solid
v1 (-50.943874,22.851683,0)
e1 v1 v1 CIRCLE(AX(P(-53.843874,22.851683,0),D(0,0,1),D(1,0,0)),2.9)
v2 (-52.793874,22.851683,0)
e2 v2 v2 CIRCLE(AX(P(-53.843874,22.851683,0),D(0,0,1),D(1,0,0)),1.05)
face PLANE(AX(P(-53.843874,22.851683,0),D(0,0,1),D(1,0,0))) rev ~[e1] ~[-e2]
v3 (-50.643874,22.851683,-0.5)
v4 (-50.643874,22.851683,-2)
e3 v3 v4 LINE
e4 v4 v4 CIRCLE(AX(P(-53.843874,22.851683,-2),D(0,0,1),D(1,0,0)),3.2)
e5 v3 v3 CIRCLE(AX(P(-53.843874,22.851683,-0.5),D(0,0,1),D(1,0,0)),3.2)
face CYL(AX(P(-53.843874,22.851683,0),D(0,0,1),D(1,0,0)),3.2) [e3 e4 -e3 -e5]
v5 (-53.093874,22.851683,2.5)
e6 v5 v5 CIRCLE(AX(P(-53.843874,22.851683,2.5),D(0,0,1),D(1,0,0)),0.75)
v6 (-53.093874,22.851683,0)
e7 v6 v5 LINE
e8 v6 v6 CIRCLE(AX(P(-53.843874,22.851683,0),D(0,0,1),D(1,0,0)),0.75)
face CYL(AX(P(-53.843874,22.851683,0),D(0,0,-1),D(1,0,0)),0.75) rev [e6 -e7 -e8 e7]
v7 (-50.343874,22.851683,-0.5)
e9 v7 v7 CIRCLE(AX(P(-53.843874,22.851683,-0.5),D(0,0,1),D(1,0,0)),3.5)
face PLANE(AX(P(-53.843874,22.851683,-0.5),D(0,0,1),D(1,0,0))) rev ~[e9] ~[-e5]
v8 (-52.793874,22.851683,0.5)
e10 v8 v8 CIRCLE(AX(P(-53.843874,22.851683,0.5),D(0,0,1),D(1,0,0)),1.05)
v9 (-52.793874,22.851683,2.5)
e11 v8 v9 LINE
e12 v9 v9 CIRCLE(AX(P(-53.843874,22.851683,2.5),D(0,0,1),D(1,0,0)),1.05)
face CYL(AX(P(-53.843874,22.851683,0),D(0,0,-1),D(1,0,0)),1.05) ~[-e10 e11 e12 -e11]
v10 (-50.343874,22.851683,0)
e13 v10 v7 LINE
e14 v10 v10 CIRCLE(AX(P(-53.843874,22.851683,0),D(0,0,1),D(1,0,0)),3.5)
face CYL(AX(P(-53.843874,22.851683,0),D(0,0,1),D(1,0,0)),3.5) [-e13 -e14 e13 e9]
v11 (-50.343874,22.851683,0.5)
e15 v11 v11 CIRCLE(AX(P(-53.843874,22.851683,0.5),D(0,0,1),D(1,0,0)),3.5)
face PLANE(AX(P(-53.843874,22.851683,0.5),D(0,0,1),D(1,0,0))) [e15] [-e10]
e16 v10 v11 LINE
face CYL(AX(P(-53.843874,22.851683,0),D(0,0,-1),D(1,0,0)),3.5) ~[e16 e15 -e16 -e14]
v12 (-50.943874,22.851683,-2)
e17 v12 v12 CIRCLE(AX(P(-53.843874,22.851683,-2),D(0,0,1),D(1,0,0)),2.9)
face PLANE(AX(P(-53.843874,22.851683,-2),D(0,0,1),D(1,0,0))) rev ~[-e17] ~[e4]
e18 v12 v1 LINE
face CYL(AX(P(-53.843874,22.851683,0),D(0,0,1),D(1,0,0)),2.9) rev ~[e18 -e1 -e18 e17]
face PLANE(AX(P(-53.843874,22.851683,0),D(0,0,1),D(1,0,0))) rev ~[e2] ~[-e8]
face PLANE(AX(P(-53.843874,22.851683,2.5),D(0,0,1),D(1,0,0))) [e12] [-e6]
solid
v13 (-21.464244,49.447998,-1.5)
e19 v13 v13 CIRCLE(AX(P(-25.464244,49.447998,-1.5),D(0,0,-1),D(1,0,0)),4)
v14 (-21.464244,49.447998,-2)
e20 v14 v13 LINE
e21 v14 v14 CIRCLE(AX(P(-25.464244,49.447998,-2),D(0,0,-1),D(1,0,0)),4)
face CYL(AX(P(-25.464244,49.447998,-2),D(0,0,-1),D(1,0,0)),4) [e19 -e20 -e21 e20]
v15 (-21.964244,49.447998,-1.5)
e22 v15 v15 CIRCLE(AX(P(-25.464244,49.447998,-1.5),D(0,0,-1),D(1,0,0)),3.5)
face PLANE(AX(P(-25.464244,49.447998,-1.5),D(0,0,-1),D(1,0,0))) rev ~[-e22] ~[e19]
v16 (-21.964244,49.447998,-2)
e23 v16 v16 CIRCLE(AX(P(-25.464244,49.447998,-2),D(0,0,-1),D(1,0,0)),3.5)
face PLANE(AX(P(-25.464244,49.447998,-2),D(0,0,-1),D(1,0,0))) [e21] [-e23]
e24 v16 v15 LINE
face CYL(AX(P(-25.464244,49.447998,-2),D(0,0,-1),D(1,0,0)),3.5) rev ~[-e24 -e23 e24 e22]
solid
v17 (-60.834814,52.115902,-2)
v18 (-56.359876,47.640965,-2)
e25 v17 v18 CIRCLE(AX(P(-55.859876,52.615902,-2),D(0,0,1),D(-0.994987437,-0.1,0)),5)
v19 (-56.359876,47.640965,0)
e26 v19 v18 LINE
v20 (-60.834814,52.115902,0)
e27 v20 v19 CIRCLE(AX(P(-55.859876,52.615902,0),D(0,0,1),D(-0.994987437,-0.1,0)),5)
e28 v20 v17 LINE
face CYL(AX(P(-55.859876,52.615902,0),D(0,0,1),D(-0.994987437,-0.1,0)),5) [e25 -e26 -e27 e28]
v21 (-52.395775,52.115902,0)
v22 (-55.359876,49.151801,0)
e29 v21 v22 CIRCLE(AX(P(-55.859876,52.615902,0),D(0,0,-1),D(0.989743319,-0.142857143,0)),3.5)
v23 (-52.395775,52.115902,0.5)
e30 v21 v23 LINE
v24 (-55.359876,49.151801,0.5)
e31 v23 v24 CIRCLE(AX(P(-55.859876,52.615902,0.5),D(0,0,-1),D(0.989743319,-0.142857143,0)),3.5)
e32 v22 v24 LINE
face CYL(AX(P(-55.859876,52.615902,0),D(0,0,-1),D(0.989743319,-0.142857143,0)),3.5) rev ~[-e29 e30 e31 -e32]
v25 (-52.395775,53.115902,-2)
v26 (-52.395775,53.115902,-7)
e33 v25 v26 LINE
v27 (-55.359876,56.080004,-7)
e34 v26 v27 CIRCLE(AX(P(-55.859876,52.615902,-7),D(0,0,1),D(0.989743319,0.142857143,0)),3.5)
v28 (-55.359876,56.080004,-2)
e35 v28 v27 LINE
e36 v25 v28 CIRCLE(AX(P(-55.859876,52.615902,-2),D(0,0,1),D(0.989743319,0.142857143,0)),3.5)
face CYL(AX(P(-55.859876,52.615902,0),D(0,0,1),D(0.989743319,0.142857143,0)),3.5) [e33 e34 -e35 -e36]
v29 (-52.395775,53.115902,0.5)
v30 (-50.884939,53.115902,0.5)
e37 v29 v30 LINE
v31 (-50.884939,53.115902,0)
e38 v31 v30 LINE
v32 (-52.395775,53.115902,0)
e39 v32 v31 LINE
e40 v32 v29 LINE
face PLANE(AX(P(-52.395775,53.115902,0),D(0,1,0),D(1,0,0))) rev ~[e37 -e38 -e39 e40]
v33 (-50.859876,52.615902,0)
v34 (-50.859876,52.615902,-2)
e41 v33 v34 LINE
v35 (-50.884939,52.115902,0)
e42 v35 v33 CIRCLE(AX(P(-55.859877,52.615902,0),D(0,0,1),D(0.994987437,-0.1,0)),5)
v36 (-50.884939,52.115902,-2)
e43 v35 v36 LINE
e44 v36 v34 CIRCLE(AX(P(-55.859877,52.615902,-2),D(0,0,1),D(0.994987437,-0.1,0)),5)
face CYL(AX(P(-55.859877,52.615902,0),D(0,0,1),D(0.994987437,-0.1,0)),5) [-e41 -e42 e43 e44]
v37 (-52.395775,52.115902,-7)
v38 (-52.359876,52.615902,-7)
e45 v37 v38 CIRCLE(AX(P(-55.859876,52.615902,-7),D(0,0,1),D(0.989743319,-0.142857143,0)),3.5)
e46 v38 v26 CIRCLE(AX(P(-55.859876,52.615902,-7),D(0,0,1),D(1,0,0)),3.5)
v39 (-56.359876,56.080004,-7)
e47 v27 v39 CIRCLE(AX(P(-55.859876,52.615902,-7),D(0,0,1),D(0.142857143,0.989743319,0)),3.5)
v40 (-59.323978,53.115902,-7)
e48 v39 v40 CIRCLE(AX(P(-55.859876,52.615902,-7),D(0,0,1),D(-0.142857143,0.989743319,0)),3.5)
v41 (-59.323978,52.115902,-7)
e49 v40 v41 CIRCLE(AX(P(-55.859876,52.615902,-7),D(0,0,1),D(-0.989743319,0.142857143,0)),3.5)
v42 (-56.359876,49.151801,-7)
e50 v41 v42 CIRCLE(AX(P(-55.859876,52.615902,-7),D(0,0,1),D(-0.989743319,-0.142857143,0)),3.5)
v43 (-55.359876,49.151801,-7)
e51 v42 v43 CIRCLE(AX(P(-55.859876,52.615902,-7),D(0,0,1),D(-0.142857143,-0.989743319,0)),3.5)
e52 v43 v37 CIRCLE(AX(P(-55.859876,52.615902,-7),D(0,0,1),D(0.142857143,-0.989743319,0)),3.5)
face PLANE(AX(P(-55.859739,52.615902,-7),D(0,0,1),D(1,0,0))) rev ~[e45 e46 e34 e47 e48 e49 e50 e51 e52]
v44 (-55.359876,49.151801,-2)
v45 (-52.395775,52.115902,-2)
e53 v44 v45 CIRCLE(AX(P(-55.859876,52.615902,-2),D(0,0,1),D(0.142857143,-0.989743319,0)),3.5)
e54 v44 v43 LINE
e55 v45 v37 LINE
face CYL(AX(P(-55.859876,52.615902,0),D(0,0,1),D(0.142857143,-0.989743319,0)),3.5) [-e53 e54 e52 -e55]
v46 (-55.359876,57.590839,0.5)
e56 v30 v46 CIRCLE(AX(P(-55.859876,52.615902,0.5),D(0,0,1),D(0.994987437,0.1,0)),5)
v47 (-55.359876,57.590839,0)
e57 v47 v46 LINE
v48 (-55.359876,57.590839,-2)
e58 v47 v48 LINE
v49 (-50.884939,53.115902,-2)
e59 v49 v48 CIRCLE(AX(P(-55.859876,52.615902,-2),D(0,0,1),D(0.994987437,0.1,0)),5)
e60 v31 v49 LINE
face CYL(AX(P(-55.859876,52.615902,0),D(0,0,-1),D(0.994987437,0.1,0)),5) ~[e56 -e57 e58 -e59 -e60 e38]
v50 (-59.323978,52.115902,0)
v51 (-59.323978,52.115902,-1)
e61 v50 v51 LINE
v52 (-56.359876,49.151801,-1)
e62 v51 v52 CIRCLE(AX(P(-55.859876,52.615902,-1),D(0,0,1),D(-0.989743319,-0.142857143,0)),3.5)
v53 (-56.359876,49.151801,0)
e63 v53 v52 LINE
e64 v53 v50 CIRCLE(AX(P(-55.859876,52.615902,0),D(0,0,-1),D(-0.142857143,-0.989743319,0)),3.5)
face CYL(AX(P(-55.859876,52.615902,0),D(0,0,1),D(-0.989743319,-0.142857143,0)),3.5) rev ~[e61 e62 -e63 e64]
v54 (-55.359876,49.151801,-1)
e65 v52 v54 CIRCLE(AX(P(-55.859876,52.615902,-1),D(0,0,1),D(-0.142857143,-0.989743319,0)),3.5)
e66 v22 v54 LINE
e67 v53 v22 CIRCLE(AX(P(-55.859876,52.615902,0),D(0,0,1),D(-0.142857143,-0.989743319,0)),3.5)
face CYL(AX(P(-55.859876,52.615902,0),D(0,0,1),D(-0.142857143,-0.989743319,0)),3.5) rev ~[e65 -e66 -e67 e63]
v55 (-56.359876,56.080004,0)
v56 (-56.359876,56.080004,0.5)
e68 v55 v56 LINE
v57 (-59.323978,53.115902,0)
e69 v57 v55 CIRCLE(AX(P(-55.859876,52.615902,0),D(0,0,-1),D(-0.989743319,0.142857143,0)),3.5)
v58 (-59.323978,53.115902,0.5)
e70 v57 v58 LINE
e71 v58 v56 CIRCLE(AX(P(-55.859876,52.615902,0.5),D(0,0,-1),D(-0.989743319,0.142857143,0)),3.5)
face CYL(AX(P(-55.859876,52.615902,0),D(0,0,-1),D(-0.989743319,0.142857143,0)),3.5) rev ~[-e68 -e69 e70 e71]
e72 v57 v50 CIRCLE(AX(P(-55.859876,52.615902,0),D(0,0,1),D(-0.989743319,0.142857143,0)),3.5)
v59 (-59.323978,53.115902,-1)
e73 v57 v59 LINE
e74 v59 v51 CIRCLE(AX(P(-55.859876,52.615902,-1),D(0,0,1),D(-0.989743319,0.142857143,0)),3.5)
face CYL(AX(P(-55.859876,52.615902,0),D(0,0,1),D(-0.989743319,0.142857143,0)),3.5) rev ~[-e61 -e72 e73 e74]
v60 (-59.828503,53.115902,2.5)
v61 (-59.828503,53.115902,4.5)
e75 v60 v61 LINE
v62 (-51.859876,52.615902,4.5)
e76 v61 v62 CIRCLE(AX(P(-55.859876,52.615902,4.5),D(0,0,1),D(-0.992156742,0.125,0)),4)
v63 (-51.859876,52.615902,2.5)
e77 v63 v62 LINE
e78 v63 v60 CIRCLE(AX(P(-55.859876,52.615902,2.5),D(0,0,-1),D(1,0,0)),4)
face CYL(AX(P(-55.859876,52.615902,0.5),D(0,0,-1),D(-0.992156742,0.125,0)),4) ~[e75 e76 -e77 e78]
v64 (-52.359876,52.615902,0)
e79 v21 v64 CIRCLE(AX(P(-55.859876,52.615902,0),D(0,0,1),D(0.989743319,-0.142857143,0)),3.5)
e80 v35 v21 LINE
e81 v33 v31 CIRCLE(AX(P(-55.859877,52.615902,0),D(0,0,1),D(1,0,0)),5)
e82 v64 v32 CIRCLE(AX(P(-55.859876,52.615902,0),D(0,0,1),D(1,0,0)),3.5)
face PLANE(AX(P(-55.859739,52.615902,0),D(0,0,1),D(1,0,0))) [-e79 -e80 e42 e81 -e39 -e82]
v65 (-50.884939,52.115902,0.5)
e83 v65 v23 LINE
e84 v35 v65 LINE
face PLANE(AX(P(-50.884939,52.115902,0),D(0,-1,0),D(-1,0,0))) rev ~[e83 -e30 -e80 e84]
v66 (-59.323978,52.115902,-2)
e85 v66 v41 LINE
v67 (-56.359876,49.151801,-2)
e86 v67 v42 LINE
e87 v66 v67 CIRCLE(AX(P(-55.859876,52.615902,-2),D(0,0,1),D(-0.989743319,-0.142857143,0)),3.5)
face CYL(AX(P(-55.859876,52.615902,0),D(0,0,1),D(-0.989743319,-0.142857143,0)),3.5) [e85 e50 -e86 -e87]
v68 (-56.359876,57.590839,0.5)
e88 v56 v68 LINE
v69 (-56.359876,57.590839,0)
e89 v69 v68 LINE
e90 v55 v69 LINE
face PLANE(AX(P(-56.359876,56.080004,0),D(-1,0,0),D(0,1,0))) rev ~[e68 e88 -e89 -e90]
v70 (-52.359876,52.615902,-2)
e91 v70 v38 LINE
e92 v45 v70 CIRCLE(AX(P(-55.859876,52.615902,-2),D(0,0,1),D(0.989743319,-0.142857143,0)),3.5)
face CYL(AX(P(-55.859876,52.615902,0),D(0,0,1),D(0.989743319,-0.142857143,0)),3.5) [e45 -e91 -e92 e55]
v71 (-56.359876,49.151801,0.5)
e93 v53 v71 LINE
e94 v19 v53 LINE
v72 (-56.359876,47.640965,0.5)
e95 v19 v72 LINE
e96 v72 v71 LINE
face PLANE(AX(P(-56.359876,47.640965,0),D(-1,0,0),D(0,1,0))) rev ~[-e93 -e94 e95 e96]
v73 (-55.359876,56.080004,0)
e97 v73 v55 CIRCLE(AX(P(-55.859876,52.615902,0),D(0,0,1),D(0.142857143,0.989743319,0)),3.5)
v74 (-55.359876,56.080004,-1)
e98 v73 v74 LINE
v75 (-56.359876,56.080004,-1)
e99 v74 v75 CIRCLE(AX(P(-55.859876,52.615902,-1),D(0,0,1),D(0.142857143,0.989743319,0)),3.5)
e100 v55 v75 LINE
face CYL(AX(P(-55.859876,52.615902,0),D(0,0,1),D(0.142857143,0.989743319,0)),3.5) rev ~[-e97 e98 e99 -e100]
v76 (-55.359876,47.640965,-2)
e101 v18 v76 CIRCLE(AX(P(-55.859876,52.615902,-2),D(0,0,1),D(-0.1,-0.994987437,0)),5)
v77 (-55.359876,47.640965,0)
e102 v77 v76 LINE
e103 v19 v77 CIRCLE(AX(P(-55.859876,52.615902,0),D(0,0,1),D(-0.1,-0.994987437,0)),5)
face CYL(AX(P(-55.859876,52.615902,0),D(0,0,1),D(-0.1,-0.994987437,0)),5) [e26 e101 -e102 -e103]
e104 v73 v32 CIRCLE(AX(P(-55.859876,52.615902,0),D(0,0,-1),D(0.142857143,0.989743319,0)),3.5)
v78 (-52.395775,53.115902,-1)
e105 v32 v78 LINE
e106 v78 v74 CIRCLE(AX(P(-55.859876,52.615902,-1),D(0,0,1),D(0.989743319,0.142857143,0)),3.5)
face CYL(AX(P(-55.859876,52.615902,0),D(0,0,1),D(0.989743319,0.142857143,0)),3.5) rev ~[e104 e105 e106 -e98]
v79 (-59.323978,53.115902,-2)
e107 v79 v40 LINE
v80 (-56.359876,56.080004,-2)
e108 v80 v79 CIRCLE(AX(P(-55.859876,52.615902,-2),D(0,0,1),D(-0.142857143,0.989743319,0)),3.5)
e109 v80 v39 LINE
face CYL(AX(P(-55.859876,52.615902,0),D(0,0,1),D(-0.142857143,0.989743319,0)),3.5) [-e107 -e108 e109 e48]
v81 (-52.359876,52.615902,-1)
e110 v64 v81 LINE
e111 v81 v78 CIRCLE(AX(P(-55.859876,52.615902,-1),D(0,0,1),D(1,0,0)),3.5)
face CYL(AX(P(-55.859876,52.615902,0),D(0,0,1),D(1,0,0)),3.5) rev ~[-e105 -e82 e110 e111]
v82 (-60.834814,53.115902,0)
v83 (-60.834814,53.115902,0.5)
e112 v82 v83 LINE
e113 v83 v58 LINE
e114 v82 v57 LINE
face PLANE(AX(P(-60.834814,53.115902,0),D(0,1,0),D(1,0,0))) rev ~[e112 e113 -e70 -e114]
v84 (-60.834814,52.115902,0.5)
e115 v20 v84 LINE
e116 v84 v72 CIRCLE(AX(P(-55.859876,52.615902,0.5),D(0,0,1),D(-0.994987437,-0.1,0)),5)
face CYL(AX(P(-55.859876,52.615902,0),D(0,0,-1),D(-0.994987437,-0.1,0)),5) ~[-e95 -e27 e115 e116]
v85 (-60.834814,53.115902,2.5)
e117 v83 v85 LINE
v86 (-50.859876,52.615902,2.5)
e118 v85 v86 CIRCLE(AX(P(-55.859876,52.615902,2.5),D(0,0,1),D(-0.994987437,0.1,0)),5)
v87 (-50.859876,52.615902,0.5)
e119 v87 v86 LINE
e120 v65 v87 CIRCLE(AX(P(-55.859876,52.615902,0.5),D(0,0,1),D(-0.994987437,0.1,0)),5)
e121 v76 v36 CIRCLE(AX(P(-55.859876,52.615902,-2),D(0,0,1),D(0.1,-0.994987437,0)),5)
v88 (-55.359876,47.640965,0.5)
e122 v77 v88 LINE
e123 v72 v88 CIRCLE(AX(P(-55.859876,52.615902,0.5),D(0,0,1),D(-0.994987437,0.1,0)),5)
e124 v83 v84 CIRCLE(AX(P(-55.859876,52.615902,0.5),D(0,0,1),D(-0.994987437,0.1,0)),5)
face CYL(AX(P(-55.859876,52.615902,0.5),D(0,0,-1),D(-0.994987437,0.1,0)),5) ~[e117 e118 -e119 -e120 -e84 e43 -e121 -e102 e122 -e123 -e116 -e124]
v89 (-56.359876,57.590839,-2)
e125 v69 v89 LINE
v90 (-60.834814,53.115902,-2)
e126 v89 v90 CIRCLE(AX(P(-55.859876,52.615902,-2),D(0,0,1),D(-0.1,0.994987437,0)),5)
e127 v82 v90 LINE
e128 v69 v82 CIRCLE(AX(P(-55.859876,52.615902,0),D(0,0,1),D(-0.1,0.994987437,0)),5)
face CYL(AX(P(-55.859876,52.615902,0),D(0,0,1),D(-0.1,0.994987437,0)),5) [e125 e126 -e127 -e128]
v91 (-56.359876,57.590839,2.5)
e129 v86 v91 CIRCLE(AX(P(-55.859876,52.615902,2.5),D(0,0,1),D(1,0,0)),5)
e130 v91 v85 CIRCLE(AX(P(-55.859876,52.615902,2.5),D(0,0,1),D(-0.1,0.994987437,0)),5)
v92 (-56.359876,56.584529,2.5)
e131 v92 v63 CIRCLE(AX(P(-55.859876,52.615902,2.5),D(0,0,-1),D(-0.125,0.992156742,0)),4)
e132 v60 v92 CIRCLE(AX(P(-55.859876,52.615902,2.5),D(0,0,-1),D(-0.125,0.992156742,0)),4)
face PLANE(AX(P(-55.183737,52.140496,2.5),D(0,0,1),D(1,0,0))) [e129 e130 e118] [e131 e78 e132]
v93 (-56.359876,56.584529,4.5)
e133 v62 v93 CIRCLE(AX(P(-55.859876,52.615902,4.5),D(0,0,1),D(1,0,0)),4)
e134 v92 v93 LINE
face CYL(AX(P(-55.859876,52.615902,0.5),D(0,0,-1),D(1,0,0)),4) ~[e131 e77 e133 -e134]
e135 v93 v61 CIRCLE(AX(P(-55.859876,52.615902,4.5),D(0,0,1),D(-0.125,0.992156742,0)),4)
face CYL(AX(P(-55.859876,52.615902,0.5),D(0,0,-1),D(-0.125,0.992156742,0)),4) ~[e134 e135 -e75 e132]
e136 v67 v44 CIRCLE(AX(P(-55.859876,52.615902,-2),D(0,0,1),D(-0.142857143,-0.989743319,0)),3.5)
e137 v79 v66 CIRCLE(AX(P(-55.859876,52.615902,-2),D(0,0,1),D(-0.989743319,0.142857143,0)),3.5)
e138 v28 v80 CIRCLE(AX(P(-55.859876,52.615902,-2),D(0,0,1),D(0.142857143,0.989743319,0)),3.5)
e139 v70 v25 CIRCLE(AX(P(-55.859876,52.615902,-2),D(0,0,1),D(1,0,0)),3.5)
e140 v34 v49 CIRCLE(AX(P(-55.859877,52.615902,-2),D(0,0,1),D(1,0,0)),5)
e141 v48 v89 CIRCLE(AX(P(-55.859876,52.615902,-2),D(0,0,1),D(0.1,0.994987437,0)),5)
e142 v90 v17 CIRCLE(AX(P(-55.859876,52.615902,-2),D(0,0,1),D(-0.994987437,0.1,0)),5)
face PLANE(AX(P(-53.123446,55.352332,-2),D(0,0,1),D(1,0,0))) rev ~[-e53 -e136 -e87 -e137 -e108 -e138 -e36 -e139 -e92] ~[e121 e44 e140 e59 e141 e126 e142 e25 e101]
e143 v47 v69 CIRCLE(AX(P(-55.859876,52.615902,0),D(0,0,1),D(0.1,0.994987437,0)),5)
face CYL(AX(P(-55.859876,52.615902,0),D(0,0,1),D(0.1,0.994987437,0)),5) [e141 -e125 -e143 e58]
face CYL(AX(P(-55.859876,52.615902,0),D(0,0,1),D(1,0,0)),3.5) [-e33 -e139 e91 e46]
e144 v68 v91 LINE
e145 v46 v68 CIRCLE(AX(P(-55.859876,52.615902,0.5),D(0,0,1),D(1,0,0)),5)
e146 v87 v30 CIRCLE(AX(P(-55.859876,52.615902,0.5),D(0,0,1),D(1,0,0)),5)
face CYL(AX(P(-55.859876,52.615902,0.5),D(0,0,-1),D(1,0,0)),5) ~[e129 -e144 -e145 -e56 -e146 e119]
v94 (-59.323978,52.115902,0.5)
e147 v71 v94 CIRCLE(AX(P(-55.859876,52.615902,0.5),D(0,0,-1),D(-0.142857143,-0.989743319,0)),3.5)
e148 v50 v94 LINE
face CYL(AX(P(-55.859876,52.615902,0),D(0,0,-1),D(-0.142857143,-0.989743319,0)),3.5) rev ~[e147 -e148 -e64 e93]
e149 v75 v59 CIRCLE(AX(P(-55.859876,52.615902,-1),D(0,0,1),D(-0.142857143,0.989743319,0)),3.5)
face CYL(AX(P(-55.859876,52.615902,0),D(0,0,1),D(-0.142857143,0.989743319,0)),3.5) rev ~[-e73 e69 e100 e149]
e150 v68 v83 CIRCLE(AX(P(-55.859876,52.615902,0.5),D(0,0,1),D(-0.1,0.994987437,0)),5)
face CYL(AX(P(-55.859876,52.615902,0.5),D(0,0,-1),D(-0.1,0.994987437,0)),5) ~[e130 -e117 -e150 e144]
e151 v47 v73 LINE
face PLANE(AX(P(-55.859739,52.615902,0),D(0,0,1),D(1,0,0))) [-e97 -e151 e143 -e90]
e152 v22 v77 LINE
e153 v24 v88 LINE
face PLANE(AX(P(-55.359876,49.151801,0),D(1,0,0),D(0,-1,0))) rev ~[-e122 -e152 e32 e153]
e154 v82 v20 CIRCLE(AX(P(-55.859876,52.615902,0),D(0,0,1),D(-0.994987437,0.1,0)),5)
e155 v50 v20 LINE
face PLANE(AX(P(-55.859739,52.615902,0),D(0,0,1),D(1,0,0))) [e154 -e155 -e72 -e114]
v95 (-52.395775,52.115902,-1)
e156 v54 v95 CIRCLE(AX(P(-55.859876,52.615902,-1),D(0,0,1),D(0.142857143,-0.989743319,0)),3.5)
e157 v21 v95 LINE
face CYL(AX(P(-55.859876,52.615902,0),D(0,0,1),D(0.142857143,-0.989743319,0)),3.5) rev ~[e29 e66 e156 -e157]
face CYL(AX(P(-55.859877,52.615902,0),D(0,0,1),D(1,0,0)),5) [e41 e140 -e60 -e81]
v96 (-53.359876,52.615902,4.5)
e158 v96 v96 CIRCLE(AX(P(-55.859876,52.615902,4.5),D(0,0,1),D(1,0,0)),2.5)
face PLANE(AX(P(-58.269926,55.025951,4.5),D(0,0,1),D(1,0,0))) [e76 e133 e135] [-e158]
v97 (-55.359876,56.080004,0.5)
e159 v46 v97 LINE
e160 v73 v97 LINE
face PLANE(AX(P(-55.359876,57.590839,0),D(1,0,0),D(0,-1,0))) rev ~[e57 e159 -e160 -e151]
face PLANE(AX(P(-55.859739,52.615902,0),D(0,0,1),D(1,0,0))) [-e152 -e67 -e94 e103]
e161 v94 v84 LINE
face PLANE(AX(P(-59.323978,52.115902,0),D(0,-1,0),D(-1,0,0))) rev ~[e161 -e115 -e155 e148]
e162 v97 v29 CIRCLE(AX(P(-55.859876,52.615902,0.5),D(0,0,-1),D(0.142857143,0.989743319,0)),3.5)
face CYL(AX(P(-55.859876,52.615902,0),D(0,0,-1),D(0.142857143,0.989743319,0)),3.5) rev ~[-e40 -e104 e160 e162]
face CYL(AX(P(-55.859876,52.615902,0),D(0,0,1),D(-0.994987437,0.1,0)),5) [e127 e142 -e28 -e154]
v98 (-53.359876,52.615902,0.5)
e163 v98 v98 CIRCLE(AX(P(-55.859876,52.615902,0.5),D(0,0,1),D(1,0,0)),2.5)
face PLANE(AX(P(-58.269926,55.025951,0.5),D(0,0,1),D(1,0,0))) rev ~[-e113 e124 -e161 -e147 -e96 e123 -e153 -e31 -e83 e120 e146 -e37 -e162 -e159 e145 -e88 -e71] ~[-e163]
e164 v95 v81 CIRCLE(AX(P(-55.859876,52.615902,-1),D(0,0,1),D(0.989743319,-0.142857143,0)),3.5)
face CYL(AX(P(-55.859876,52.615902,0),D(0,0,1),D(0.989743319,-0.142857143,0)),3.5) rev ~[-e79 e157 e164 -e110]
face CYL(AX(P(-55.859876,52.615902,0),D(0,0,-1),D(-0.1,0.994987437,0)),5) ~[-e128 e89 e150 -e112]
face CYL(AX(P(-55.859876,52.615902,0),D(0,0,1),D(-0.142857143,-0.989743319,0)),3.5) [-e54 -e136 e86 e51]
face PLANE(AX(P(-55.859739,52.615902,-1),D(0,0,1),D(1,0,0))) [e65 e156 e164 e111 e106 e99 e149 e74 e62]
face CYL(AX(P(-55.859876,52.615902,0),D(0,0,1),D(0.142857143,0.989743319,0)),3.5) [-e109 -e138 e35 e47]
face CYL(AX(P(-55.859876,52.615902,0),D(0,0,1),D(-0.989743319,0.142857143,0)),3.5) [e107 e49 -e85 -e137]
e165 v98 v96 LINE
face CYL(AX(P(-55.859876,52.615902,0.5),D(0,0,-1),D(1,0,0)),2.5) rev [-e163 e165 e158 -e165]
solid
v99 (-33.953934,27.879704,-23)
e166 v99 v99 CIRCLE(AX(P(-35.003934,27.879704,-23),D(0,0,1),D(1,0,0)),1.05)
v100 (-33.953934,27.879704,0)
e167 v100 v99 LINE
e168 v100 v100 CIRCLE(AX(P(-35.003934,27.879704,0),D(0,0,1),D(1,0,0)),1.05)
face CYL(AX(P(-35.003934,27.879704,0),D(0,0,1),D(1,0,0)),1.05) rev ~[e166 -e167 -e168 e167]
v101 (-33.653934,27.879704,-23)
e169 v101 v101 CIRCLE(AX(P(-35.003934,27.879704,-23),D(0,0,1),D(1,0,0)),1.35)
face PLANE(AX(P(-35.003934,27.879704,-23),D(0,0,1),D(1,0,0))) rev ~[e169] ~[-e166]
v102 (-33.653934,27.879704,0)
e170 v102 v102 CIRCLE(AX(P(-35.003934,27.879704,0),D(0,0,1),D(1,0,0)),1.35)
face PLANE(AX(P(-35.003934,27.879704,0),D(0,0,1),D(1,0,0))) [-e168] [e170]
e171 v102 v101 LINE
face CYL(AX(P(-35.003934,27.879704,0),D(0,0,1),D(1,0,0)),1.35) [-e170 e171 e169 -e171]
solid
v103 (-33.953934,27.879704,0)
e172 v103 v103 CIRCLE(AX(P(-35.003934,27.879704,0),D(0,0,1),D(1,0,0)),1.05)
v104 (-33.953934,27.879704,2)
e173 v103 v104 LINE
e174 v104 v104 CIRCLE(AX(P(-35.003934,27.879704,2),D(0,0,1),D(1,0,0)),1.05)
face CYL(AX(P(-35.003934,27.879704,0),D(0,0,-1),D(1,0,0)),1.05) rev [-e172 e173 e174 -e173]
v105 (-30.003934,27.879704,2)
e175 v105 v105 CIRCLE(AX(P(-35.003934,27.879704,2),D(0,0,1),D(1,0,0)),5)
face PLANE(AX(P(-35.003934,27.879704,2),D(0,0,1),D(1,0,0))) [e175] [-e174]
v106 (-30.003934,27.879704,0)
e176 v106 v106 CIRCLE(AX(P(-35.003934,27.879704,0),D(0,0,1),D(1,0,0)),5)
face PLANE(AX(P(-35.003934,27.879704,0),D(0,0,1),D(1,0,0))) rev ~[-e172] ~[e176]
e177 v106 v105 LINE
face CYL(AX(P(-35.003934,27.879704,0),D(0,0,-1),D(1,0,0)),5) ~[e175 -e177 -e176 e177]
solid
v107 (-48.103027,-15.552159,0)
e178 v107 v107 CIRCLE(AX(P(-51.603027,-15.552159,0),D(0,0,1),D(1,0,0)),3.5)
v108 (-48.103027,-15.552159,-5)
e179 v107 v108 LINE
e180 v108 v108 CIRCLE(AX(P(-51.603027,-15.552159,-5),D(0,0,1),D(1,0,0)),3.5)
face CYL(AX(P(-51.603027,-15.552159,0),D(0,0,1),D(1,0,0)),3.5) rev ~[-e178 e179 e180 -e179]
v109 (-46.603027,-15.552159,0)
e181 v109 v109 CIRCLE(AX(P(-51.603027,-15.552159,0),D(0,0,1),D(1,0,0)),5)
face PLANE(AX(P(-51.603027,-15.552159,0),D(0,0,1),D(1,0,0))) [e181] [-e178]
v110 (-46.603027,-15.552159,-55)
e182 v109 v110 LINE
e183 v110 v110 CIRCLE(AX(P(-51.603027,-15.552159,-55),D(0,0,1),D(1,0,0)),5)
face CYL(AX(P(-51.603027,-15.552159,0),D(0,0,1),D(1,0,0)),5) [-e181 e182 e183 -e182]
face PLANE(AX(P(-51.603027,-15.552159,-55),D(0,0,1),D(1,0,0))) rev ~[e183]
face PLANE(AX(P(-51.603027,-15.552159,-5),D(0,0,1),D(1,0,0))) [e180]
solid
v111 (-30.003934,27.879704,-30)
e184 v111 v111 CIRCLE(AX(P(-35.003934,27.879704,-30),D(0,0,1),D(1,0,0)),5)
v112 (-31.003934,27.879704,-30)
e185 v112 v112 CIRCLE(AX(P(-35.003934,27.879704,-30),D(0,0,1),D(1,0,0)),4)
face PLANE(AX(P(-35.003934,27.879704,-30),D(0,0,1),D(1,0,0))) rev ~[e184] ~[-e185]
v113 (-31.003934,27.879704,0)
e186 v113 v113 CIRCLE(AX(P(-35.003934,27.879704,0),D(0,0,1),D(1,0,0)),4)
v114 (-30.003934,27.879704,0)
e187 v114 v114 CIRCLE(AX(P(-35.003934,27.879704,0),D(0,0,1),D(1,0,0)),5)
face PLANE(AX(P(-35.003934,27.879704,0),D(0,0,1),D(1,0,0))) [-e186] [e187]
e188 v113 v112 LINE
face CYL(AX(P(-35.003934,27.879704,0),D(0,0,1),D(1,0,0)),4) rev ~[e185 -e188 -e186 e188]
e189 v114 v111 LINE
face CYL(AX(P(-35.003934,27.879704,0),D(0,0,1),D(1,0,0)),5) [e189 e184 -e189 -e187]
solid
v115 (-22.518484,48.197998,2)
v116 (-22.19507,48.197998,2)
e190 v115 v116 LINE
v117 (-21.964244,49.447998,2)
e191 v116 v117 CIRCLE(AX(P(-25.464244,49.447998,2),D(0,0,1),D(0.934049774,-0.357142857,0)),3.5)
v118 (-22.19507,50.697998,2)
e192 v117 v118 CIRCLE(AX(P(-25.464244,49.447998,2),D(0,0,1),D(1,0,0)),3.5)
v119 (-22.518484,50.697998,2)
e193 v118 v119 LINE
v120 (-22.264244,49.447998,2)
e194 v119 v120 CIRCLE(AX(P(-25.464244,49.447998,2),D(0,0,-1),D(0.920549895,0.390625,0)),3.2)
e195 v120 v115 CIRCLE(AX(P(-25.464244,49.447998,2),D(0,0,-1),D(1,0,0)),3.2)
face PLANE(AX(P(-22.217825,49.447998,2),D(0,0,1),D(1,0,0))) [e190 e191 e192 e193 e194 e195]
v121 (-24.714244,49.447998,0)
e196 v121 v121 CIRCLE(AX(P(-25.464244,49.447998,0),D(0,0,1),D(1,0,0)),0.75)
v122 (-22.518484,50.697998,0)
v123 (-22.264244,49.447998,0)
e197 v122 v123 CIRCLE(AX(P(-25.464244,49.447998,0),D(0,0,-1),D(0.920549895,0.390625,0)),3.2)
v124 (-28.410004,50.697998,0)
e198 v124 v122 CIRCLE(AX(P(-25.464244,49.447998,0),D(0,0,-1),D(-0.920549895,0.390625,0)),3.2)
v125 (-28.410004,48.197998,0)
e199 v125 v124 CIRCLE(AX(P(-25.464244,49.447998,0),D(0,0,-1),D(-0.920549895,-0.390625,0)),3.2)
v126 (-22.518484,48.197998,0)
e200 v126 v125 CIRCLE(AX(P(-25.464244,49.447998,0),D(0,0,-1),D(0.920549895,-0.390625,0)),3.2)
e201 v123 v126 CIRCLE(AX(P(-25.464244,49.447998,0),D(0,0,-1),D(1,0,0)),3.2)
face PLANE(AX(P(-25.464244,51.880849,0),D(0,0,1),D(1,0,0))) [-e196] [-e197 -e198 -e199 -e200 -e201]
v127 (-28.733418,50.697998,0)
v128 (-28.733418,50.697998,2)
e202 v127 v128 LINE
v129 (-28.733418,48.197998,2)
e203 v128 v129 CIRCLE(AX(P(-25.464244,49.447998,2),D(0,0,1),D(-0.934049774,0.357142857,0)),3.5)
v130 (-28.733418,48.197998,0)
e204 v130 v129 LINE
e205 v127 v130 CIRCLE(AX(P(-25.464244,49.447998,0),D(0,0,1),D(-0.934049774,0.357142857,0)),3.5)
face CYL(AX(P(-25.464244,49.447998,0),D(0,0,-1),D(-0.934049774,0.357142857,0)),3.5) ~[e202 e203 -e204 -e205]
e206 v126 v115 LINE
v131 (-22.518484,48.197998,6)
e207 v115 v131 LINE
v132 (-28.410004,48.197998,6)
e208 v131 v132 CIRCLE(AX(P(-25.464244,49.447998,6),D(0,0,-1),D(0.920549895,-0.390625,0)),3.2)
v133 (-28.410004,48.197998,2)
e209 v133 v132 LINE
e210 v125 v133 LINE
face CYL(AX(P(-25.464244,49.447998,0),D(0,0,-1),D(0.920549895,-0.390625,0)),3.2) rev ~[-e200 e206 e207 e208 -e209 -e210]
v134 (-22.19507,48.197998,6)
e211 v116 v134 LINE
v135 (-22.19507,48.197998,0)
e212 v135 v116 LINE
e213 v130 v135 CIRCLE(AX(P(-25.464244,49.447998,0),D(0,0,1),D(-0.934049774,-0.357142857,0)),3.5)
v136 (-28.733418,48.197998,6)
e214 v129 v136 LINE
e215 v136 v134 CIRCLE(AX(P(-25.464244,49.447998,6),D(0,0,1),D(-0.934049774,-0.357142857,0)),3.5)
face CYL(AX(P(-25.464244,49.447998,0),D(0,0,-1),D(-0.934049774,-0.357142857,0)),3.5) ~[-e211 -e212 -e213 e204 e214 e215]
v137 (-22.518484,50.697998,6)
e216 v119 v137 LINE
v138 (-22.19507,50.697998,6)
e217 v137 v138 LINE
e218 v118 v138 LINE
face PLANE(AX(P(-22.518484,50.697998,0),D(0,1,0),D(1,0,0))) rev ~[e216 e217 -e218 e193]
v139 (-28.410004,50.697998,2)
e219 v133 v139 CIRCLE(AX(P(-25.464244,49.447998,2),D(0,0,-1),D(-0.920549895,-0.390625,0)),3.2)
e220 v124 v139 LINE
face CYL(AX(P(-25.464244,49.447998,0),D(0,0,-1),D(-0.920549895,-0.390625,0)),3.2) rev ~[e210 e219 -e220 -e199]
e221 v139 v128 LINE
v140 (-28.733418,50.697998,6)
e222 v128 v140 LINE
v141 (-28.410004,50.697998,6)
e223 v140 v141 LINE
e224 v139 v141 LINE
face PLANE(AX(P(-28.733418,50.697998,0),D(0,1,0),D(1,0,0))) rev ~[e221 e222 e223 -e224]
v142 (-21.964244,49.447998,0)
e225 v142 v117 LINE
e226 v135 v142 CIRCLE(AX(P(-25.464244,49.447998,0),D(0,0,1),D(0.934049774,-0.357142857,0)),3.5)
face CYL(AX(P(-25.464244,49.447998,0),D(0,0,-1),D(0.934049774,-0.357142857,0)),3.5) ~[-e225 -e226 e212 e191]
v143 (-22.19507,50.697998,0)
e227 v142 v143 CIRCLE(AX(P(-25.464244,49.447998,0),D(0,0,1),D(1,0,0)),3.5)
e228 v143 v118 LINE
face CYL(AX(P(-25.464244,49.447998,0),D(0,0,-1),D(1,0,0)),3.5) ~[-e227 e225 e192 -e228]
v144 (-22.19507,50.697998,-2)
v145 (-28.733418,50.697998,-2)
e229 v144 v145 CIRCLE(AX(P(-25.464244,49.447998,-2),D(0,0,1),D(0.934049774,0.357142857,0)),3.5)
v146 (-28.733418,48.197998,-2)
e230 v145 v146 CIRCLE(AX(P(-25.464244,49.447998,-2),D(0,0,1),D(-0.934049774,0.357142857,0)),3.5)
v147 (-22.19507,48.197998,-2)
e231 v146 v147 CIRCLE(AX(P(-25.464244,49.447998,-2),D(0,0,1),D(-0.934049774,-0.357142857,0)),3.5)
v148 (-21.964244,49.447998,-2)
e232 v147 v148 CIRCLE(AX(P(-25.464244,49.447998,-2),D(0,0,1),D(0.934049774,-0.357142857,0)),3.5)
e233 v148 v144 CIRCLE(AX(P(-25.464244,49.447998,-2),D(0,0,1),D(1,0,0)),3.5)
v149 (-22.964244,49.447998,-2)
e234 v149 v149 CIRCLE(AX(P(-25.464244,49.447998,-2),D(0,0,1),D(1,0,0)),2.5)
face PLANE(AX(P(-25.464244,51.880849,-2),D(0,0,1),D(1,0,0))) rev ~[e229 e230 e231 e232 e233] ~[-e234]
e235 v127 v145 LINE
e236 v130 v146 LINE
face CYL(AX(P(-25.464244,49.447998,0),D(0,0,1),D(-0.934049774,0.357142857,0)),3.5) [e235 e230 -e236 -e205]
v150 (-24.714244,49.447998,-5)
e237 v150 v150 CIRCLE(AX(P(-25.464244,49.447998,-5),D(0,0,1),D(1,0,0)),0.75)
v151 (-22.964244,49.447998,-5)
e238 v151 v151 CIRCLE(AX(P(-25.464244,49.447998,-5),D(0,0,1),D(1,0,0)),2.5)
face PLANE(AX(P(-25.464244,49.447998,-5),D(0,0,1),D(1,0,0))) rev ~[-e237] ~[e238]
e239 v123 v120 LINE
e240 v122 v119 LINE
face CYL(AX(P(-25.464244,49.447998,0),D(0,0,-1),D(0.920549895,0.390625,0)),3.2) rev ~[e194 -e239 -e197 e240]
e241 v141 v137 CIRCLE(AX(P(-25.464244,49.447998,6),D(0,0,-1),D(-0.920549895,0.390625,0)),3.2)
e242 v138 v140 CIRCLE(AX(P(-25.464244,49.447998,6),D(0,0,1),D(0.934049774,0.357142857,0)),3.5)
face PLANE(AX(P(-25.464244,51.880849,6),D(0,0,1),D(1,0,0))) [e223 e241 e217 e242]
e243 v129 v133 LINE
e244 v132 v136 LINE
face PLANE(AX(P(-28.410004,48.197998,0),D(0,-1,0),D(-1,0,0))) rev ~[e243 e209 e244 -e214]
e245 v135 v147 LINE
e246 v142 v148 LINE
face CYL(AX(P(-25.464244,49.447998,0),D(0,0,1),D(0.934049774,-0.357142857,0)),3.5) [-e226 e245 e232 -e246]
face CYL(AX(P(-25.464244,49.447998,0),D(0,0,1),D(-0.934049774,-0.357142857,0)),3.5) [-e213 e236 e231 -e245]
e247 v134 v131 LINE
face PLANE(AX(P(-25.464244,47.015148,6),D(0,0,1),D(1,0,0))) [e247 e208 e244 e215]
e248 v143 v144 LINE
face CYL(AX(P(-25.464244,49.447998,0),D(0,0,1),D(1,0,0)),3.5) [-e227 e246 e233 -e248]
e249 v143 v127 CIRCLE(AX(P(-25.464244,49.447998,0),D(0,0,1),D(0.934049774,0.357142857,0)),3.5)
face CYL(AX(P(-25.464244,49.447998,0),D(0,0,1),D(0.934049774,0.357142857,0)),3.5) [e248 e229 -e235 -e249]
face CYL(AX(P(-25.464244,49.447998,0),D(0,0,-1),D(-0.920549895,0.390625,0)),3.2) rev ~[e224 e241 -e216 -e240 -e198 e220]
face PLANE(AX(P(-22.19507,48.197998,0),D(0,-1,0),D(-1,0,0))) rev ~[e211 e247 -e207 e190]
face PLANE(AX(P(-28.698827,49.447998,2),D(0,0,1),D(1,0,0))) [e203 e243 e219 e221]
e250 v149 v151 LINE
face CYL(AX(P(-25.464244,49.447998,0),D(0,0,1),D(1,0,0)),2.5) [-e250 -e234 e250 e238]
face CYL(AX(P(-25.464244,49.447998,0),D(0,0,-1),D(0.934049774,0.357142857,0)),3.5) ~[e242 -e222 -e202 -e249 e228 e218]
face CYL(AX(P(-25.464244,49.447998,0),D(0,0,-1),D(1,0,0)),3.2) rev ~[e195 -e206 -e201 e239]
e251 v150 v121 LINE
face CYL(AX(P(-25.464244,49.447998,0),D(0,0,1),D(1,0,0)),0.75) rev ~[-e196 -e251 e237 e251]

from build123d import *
from build123d import SkipClean  # not in build123d's __all__

# Parameters (mm, degrees)
F1_DEPTH  = 2
F2_DEPTH  = 7
F3_DEPTH  = 0.5
F5_DEPTH  = 2
F4_R      = 2.5
F6_DEPTH  = 4
F7_DEPTH  = 1
F8_R      = 2.5
F8_R_2    = 0.75
F9_DEPTH  = 2
F10_DEPTH = 5
F11_DEPTH = 2
F12_DEPTH = 6
F13_R     = 3.5
F13_R_2   = 3.2
F13_R_3   = 2.9
F14_DEPTH = 0.5
F15_DEPTH = 2
F13_R_4   = 1.05
F16_DEPTH = 0.5
F13_R_5   = 0.75
F17_DEPTH = 2.5
F18_R     = 5
F18_R_2   = 4
F19_DEPTH = 30
F18_R_3   = 1.35
F18_R_4   = 1.05
F20_DEPTH = 23
F21_DEPTH = 2
F22_R     = 4
F22_R_2   = 3.5
F23_DEPTH = 0.5
F24_R     = 5
F24_R_2   = 3.5
F25_DEPTH = 55
F26_DEPTH = 5


with BuildPart() as f1:
    # F0 (on Top) → F1 (new body)
    with BuildSketch(Plane.XY):
        with BuildLine():
            Line((-52.3957748821, 53.1159022585), (-50.8849393117, 53.1159022585))
            ThreePointArc((-50.8849393117, 53.1159022585), (-52.3243425913, 56.1514361644), (-55.3598764972, 57.590839444))
            Line((-55.3598764972, 57.590839444), (-55.3598764972, 56.0800038736))
            ThreePointArc((-55.3598764972, 56.0800038736), (-53.3850027631, 55.0907759926), (-52.3957748821, 53.1159022585))
        make_face()
        with BuildLine():
            Line((-59.3239781124, 53.1159022585), (-60.8348136828, 53.1159022585))
            ThreePointArc((-60.8348136828, 53.1159022585), (-60.8598764972, 52.6159022585), (-60.8348136828, 52.1159022585))
            Line((-60.8348136828, 52.1159022585), (-59.3239781124, 52.1159022585))
            ThreePointArc((-59.3239781124, 52.1159022585), (-59.3598764972, 52.6159022585), (-59.3239781124, 53.1159022585))
        make_face()
        with BuildLine():
            ThreePointArc((-56.3598764972, 47.6409650729), (-55.8598764972, 47.6159022585), (-55.3598764972, 47.6409650729))
            Line((-55.3598764972, 47.6409650729), (-55.3598764972, 49.1518006433))
            ThreePointArc((-55.3598764972, 49.1518006433), (-55.8598764972, 49.1159022585), (-56.3598764972, 49.1518006433))
            Line((-56.3598764972, 49.1518006433), (-56.3598764972, 47.6409650729))
        make_face()
        with BuildLine():
            ThreePointArc((-55.3598764972, 47.6409650729), (-52.3243425913, 49.0803683525), (-50.8849393117, 52.1159022585))
            Line((-50.8849393117, 52.1159022585), (-52.3957748821, 52.1159022585))
            ThreePointArc((-52.3957748821, 52.1159022585), (-53.3850027631, 50.1410285243), (-55.3598764972, 49.1518006433))
            Line((-55.3598764972, 49.1518006433), (-55.3598764972, 47.6409650729))
        make_face()
        with BuildLine():
            ThreePointArc((-52.3598764972, 52.6159022585), (-52.3688626292, 52.8665457773), (-52.3957748821, 53.1159022585))
            ThreePointArc((-52.3957748821, 53.1159022585), (-53.3850027631, 55.0907759926), (-55.3598764972, 56.0800038736))
            ThreePointArc((-55.3598764972, 56.0800038736), (-55.8598764972, 56.1159022585), (-56.3598764972, 56.0800038736))
            ThreePointArc((-56.3598764972, 56.0800038736), (-58.3347502314, 55.0907759926), (-59.3239781124, 53.1159022585))
            ThreePointArc((-59.3239781124, 53.1159022585), (-59.3598764972, 52.6159022585), (-59.3239781124, 52.1159022585))
            ThreePointArc((-59.3239781124, 52.1159022585), (-58.3347502314, 50.1410285243), (-56.3598764972, 49.1518006433))
            ThreePointArc((-56.3598764972, 49.1518006433), (-55.8598764972, 49.1159022585), (-55.3598764972, 49.1518006433))
            ThreePointArc((-55.3598764972, 49.1518006433), (-53.3850027631, 50.1410285243), (-52.3957748821, 52.1159022585))
            ThreePointArc((-52.3957748821, 52.1159022585), (-52.3688626292, 52.3652587397), (-52.3598764972, 52.6159022585))
        make_face()
        with BuildLine():
            ThreePointArc((-50.8849393117, 52.1159022585), (-50.8661461317, 52.3655883832), (-50.8598764972, 52.6159022585))
            ThreePointArc((-50.8598764972, 52.6159022585), (-50.8661461317, 52.8662161338), (-50.8849393117, 53.1159022585))
            Line((-50.8849393117, 53.1159022585), (-52.3957748821, 53.1159022585))
            ThreePointArc((-52.3957748821, 53.1159022585), (-52.3688626292, 52.8665457773), (-52.3598764972, 52.6159022585))
            ThreePointArc((-52.3598764972, 52.6159022585), (-52.3688626292, 52.3652587397), (-52.3957748821, 52.1159022585))
            Line((-52.3957748821, 52.1159022585), (-50.8849393117, 52.1159022585))
        make_face()
        with BuildLine():
            ThreePointArc((-60.8348136828, 52.1159022585), (-59.3954104032, 49.0803683525), (-56.3598764972, 47.6409650729))
            Line((-56.3598764972, 47.6409650729), (-56.3598764972, 49.1518006433))
            ThreePointArc((-56.3598764972, 49.1518006433), (-58.3347502314, 50.1410285243), (-59.3239781124, 52.1159022585))
            Line((-59.3239781124, 52.1159022585), (-60.8348136828, 52.1159022585))
        make_face()
        with BuildLine():
            Line((-55.3598764972, 56.0800038736), (-55.3598764972, 57.590839444))
            ThreePointArc((-55.3598764972, 57.590839444), (-55.8598764972, 57.6159022585), (-56.3598764972, 57.590839444))
            Line((-56.3598764972, 57.590839444), (-56.3598764972, 56.0800038736))
            ThreePointArc((-56.3598764972, 56.0800038736), (-55.8598764972, 56.1159022585), (-55.3598764972, 56.0800038736))
        make_face()
        with BuildLine():
            Line((-56.3598764972, 56.0800038736), (-56.3598764972, 57.590839444))
            ThreePointArc((-56.3598764972, 57.590839444), (-59.3954104032, 56.1514361644), (-60.8348136828, 53.1159022585))
            Line((-60.8348136828, 53.1159022585), (-59.3239781124, 53.1159022585))
            ThreePointArc((-59.3239781124, 53.1159022585), (-58.3347502314, 55.0907759926), (-56.3598764972, 56.0800038736))
        make_face()
    extrude(amount=-F1_DEPTH)

    # F0 (on Top) → F2 (join)
    with BuildSketch(Plane.XY):
        with BuildLine():
            ThreePointArc((-52.3598764972, 52.6159022585), (-52.3688626292, 52.8665457773), (-52.3957748821, 53.1159022585))
            ThreePointArc((-52.3957748821, 53.1159022585), (-53.3850027631, 55.0907759926), (-55.3598764972, 56.0800038736))
            ThreePointArc((-55.3598764972, 56.0800038736), (-55.8598764972, 56.1159022585), (-56.3598764972, 56.0800038736))
            ThreePointArc((-56.3598764972, 56.0800038736), (-58.3347502314, 55.0907759926), (-59.3239781124, 53.1159022585))
            ThreePointArc((-59.3239781124, 53.1159022585), (-59.3598764972, 52.6159022585), (-59.3239781124, 52.1159022585))
            ThreePointArc((-59.3239781124, 52.1159022585), (-58.3347502314, 50.1410285243), (-56.3598764972, 49.1518006433))
            ThreePointArc((-56.3598764972, 49.1518006433), (-55.8598764972, 49.1159022585), (-55.3598764972, 49.1518006433))
            ThreePointArc((-55.3598764972, 49.1518006433), (-53.3850027631, 50.1410285243), (-52.3957748821, 52.1159022585))
            ThreePointArc((-52.3957748821, 52.1159022585), (-52.3688626292, 52.3652587397), (-52.3598764972, 52.6159022585))
        make_face()
    extrude(amount=-F2_DEPTH)

    # F0 (on Top) → F3 (join)
    with BuildSketch(Plane.XY):
        with BuildLine():
            Line((-52.3957748821, 53.1159022585), (-50.8849393117, 53.1159022585))
            ThreePointArc((-50.8849393117, 53.1159022585), (-52.3243425913, 56.1514361644), (-55.3598764972, 57.590839444))
            Line((-55.3598764972, 57.590839444), (-55.3598764972, 56.0800038736))
            ThreePointArc((-55.3598764972, 56.0800038736), (-53.3850027631, 55.0907759926), (-52.3957748821, 53.1159022585))
        make_face()
        with BuildLine():
            ThreePointArc((-55.3598764972, 47.6409650729), (-52.3243425913, 49.0803683525), (-50.8849393117, 52.1159022585))
            Line((-50.8849393117, 52.1159022585), (-52.3957748821, 52.1159022585))
            ThreePointArc((-52.3957748821, 52.1159022585), (-53.3850027631, 50.1410285243), (-55.3598764972, 49.1518006433))
            Line((-55.3598764972, 49.1518006433), (-55.3598764972, 47.6409650729))
        make_face()
        with BuildLine():
            ThreePointArc((-60.8348136828, 52.1159022585), (-59.3954104032, 49.0803683525), (-56.3598764972, 47.6409650729))
            Line((-56.3598764972, 47.6409650729), (-56.3598764972, 49.1518006433))
            ThreePointArc((-56.3598764972, 49.1518006433), (-58.3347502314, 50.1410285243), (-59.3239781124, 52.1159022585))
            Line((-59.3239781124, 52.1159022585), (-60.8348136828, 52.1159022585))
        make_face()
        with BuildLine():
            Line((-56.3598764972, 56.0800038736), (-56.3598764972, 57.590839444))
            ThreePointArc((-56.3598764972, 57.590839444), (-59.3954104032, 56.1514361644), (-60.8348136828, 53.1159022585))
            Line((-60.8348136828, 53.1159022585), (-59.3239781124, 53.1159022585))
            ThreePointArc((-59.3239781124, 53.1159022585), (-58.3347502314, 55.0907759926), (-56.3598764972, 56.0800038736))
        make_face()
    extrude(amount=F3_DEPTH)

    # F4 (on face) → F5 (join)
    with BuildSketch(Plane.XY.offset(0.5)):
        with BuildLine():
            ThreePointArc((-60.8348136828, 53.1159022585), (-56.1101903725, 47.6221718929), (-50.8598764972, 52.6159022585))
            ThreePointArc((-50.8598764972, 52.6159022585), (-52.505774531, 56.324001502), (-56.3598764972, 57.590839444))
            Line((-56.3598764972, 57.590839444), (-56.3598764972, 56.5845292251))
            ThreePointArc((-56.3598764972, 56.5845292251), (-53.2141251862, 55.6159022585), (-51.8598764972, 52.6159022585))
            ThreePointArc((-51.8598764972, 52.6159022585), (-56.1103681474, 48.6237532215), (-59.8285034638, 53.1159022585))
            Line((-59.8285034638, 53.1159022585), (-60.8348136828, 53.1159022585))
        make_face()
        with BuildLine():
            Line((-56.3598764972, 56.5845292251), (-56.3598764972, 57.590839444))
            ThreePointArc((-56.3598764972, 57.590839444), (-59.3954104032, 56.1514361644), (-60.8348136828, 53.1159022585))
            Line((-60.8348136828, 53.1159022585), (-59.8285034638, 53.1159022585))
            ThreePointArc((-59.8285034638, 53.1159022585), (-58.688303622, 55.4443293832), (-56.3598764972, 56.5845292251))
        make_face()
        with BuildLine():
            Line((-56.3598764972, 56.0800038736), (-56.3598764972, 56.5845292251))
            ThreePointArc((-56.3598764972, 56.5845292251), (-58.688303622, 55.4443293832), (-59.8285034638, 53.1159022585))
            Line((-59.8285034638, 53.1159022585), (-59.3239781124, 53.1159022585))
            ThreePointArc((-59.3239781124, 53.1159022585), (-58.3347502314, 55.0907759926), (-56.3598764972, 56.0800038736))
        make_face()
    extrude(amount=F5_DEPTH)

    # F4 (on face) → F6 (join)
    with BuildSketch(Plane.XY.offset(0.5)):
        with BuildLine():
            Line((-56.3598764972, 56.0800038736), (-56.3598764972, 56.5845292251))
            ThreePointArc((-56.3598764972, 56.5845292251), (-58.688303622, 55.4443293832), (-59.8285034638, 53.1159022585))
            Line((-59.8285034638, 53.1159022585), (-59.3239781124, 53.1159022585))
            ThreePointArc((-59.3239781124, 53.1159022585), (-58.3347502314, 55.0907759926), (-56.3598764972, 56.0800038736))
        make_face()
        with BuildLine():
            ThreePointArc((-51.8598764972, 52.6159022585), (-53.2141251862, 55.6159022585), (-56.3598764972, 56.5845292251))
            Line((-56.3598764972, 56.5845292251), (-56.3598764972, 56.0800038736))
            ThreePointArc((-56.3598764972, 56.0800038736), (-58.3347502314, 55.0907759926), (-59.3239781124, 53.1159022585))
            Line((-59.3239781124, 53.1159022585), (-59.8285034638, 53.1159022585))
            ThreePointArc((-59.8285034638, 53.1159022585), (-56.1103681474, 48.6237532215), (-51.8598764972, 52.6159022585))
        make_face()
        with Locations((-55.8598764972, 52.6159022585)):
            Circle(F4_R, mode=Mode.SUBTRACT)
    extrude(amount=F6_DEPTH)

    # F0 (on Top) → F7 (cut)
    with BuildSketch(Plane.XY):
        with BuildLine():
            ThreePointArc((-52.3598764972, 52.6159022585), (-52.3688626292, 52.8665457773), (-52.3957748821, 53.1159022585))
            ThreePointArc((-52.3957748821, 53.1159022585), (-53.3850027631, 55.0907759926), (-55.3598764972, 56.0800038736))
            ThreePointArc((-55.3598764972, 56.0800038736), (-55.8598764972, 56.1159022585), (-56.3598764972, 56.0800038736))
            ThreePointArc((-56.3598764972, 56.0800038736), (-58.3347502314, 55.0907759926), (-59.3239781124, 53.1159022585))
            ThreePointArc((-59.3239781124, 53.1159022585), (-59.3598764972, 52.6159022585), (-59.3239781124, 52.1159022585))
            ThreePointArc((-59.3239781124, 52.1159022585), (-58.3347502314, 50.1410285243), (-56.3598764972, 49.1518006433))
            ThreePointArc((-56.3598764972, 49.1518006433), (-55.8598764972, 49.1159022585), (-55.3598764972, 49.1518006433))
            ThreePointArc((-55.3598764972, 49.1518006433), (-53.3850027631, 50.1410285243), (-52.3957748821, 52.1159022585))
            ThreePointArc((-52.3957748821, 52.1159022585), (-52.3688626292, 52.3652587397), (-52.3598764972, 52.6159022585))
        make_face()
    extrude(amount=-F7_DEPTH, mode=Mode.SUBTRACT)


with BuildPart() as f9:
    # F8 (on Top) → F9 (new body)
    with BuildSketch(Plane.XY):
        with BuildLine():
            Line((-22.5184842519, 50.6979984153), (-22.1950697086, 50.6979984153))
            ThreePointArc((-22.1950697086, 50.6979984153), (-25.4642439163, 52.9479984153), (-28.7334181239, 50.6979984153))
            Line((-28.7334181239, 50.6979984153), (-28.4100035806, 50.6979984153))
            ThreePointArc((-28.4100035806, 50.6979984153), (-25.4642439163, 52.6479984153), (-22.5184842519, 50.6979984153))
        make_face()
        with BuildLine():
            Line((-28.4100035806, 50.6979984153), (-28.7334181239, 50.6979984153))
            ThreePointArc((-28.7334181239, 50.6979984153), (-28.9642439163, 49.4479984153), (-28.7334181239, 48.1979984153))
            Line((-28.7334181239, 48.1979984153), (-28.4100035806, 48.1979984153))
            ThreePointArc((-28.4100035806, 48.1979984153), (-28.6642439163, 49.4479984153), (-28.4100035806, 50.6979984153))
        make_face()
        with BuildLine():
            ThreePointArc((-28.7334181239, 48.1979984153), (-25.4642439163, 45.9479984153), (-22.1950697086, 48.1979984153))
            Line((-22.1950697086, 48.1979984153), (-22.5184842519, 48.1979984153))
            ThreePointArc((-22.5184842519, 48.1979984153), (-25.4642439163, 46.2479984153), (-28.4100035806, 48.1979984153))
            Line((-28.4100035806, 48.1979984153), (-28.7334181239, 48.1979984153))
        make_face()
        with BuildLine():
            ThreePointArc((-22.1950697086, 48.1979984153), (-22.0224340924, 48.8124316315), (-21.9642439163, 49.4479984153))
            ThreePointArc((-21.9642439163, 49.4479984153), (-22.0224340924, 50.083565199), (-22.1950697086, 50.6979984153))
            Line((-22.1950697086, 50.6979984153), (-22.5184842519, 50.6979984153))
            ThreePointArc((-22.5184842519, 50.6979984153), (-22.3284480902, 50.085795042), (-22.2642439163, 49.4479984153))
            ThreePointArc((-22.2642439163, 49.4479984153), (-22.3284480902, 48.8102017886), (-22.5184842519, 48.1979984153))
            Line((-22.5184842519, 48.1979984153), (-22.1950697086, 48.1979984153))
        make_face()
        with BuildLine():
            ThreePointArc((-22.2642439163, 49.4479984153), (-22.3284480902, 50.085795042), (-22.5184842519, 50.6979984153))
            ThreePointArc((-22.5184842519, 50.6979984153), (-25.4642439163, 52.6479984153), (-28.4100035806, 50.6979984153))
            ThreePointArc((-28.4100035806, 50.6979984153), (-28.6642439163, 49.4479984153), (-28.4100035806, 48.1979984153))
            ThreePointArc((-28.4100035806, 48.1979984153), (-25.4642439163, 46.2479984153), (-22.5184842519, 48.1979984153))
            ThreePointArc((-22.5184842519, 48.1979984153), (-22.3284480902, 48.8102017886), (-22.2642439163, 49.4479984153))
        make_face()
        with Locations((-25.4642439163, 49.4479984153)):
            Circle(F8_R, mode=Mode.SUBTRACT)
        with Locations((-25.4642439163, 49.4479984153)):
            Circle(F8_R)
        with Locations((-25.4642439163, 49.4479984153)):
            Circle(F8_R_2, mode=Mode.SUBTRACT)
    extrude(amount=-F9_DEPTH)

    # F8 (on Top) → F10 (join)
    with BuildSketch(Plane.XY):
        with Locations((-25.4642439163, 49.4479984153)):
            Circle(F8_R)
        with Locations((-25.4642439163, 49.4479984153)):
            Circle(F8_R_2, mode=Mode.SUBTRACT)
    extrude(amount=-F10_DEPTH)

    # F8 (on Top) → F11 (join)
    with BuildSketch(Plane.XY):
        with BuildLine():
            ThreePointArc((-22.1950697086, 48.1979984153), (-22.0224340924, 48.8124316315), (-21.9642439163, 49.4479984153))
            ThreePointArc((-21.9642439163, 49.4479984153), (-22.0224340924, 50.083565199), (-22.1950697086, 50.6979984153))
            Line((-22.1950697086, 50.6979984153), (-22.5184842519, 50.6979984153))
            ThreePointArc((-22.5184842519, 50.6979984153), (-22.3284480902, 50.085795042), (-22.2642439163, 49.4479984153))
            ThreePointArc((-22.2642439163, 49.4479984153), (-22.3284480902, 48.8102017886), (-22.5184842519, 48.1979984153))
            Line((-22.5184842519, 48.1979984153), (-22.1950697086, 48.1979984153))
        make_face()
        with BuildLine():
            Line((-28.4100035806, 50.6979984153), (-28.7334181239, 50.6979984153))
            ThreePointArc((-28.7334181239, 50.6979984153), (-28.9642439163, 49.4479984153), (-28.7334181239, 48.1979984153))
            Line((-28.7334181239, 48.1979984153), (-28.4100035806, 48.1979984153))
            ThreePointArc((-28.4100035806, 48.1979984153), (-28.6642439163, 49.4479984153), (-28.4100035806, 50.6979984153))
        make_face()
    extrude(amount=F11_DEPTH)

    # F8 (on Top) → F12 (join)
    with BuildSketch(Plane.XY):
        with BuildLine():
            ThreePointArc((-28.7334181239, 48.1979984153), (-25.4642439163, 45.9479984153), (-22.1950697086, 48.1979984153))
            Line((-22.1950697086, 48.1979984153), (-22.5184842519, 48.1979984153))
            ThreePointArc((-22.5184842519, 48.1979984153), (-25.4642439163, 46.2479984153), (-28.4100035806, 48.1979984153))
            Line((-28.4100035806, 48.1979984153), (-28.7334181239, 48.1979984153))
        make_face()
        with BuildLine():
            Line((-22.5184842519, 50.6979984153), (-22.1950697086, 50.6979984153))
            ThreePointArc((-22.1950697086, 50.6979984153), (-25.4642439163, 52.9479984153), (-28.7334181239, 50.6979984153))
            Line((-28.7334181239, 50.6979984153), (-28.4100035806, 50.6979984153))
            ThreePointArc((-28.4100035806, 50.6979984153), (-25.4642439163, 52.6479984153), (-22.5184842519, 50.6979984153))
        make_face()
    with SkipClean():  # cleaning this boolean's faces spoils the solid; the shape is the same uncleaned
        extrude(amount=F12_DEPTH)


with BuildPart() as f14:
    # F13 (on Top) → F14 (new body)
    with BuildSketch(Plane.XY):
        with Locations((-53.8438744843, 22.8516831994)):
            Circle(F13_R)
        with Locations((-53.8438744843, 22.8516831994)):
            Circle(F13_R_2, mode=Mode.SUBTRACT)
        with Locations((-53.8438744843, 22.8516831994)):
            Circle(F13_R_2)
        with Locations((-53.8438744843, 22.8516831994)):
            Circle(F13_R_3, mode=Mode.SUBTRACT)
    extrude(amount=-F14_DEPTH)

    # F13 (on Top) → F15 (join)
    with BuildSketch(Plane.XY):
        with Locations((-53.8438744843, 22.8516831994)):
            Circle(F13_R_2)
        with Locations((-53.8438744843, 22.8516831994)):
            Circle(F13_R_3, mode=Mode.SUBTRACT)
    extrude(amount=-F15_DEPTH)

    # F13 (on Top) → F16 (join)
    with BuildSketch(Plane.XY):
        with Locations((-53.8438744843, 22.8516831994)):
            Circle(F13_R)
        with Locations((-53.8438744843, 22.8516831994)):
            Circle(F13_R_2, mode=Mode.SUBTRACT)
        with Locations((-53.8438744843, 22.8516831994)):
            Circle(F13_R_2)
        with Locations((-53.8438744843, 22.8516831994)):
            Circle(F13_R_3, mode=Mode.SUBTRACT)
        with Locations((-53.8438744843, 22.8516831994)):
            Circle(F13_R_3)
        with Locations((-53.8438744843, 22.8516831994)):
            Circle(F13_R_4, mode=Mode.SUBTRACT)
    extrude(amount=F16_DEPTH)

    # F13 (on Top) → F17 (join)
    with BuildSketch(Plane.XY):
        with Locations((-53.8438744843, 22.8516831994)):
            Circle(F13_R_4)
        with Locations((-53.8438744843, 22.8516831994)):
            Circle(F13_R_5, mode=Mode.SUBTRACT)
    extrude(amount=F17_DEPTH)


with BuildPart() as f19:
    # F18 (on Top) → F19 (new body)
    with BuildSketch(Plane.XY):
        with Locations((-35.0039340556, 27.8797037899)):
            Circle(F18_R)
        with Locations((-35.0039340556, 27.8797037899)):
            Circle(F18_R_2, mode=Mode.SUBTRACT)
    extrude(amount=-F19_DEPTH)


with BuildPart() as f20:
    # F18 (on Top) → F20 (new body)
    with BuildSketch(Plane.XY):
        with Locations((-35.0039340556, 27.8797037899)):
            Circle(F18_R_3)
        with Locations((-35.0039340556, 27.8797037899)):
            Circle(F18_R_4, mode=Mode.SUBTRACT)
    extrude(amount=-F20_DEPTH)


with BuildPart() as f21:
    # F18 (on Top) → F21 (new body)
    with BuildSketch(Plane.XY):
        with Locations((-35.0039340556, 27.8797037899)):
            Circle(F18_R)
        with Locations((-35.0039340556, 27.8797037899)):
            Circle(F18_R_2, mode=Mode.SUBTRACT)
        with Locations((-35.0039340556, 27.8797037899)):
            Circle(F18_R_2)
        with Locations((-35.0039340556, 27.8797037899)):
            Circle(F18_R_3, mode=Mode.SUBTRACT)
        with Locations((-35.0039340556, 27.8797037899)):
            Circle(F18_R_3)
        with Locations((-35.0039340556, 27.8797037899)):
            Circle(F18_R_4, mode=Mode.SUBTRACT)
    extrude(amount=F21_DEPTH)


with BuildPart() as f23:
    # F22 (on face) → F23 (new body)
    with BuildSketch(Plane(origin=(0, 0, -2), x_dir=(1, 0, 0), z_dir=(0, 0, -1))):
        with Locations((-25.4642439163, -49.4479984153)):
            Circle(F22_R)
        with Locations((-25.4642439163, -49.4479984153)):
            Circle(F22_R_2, mode=Mode.SUBTRACT)
    extrude(amount=-F23_DEPTH)


with BuildPart() as f25:
    # F24 (on Top) → F25 (new body)
    with BuildSketch(Plane.XY):
        with Locations((-51.6030266881, -15.5521593988)):
            Circle(F24_R)
        with Locations((-51.6030266881, -15.5521593988)):
            Circle(F24_R_2, mode=Mode.SUBTRACT)
        with Locations((-51.6030266881, -15.5521593988)):
            Circle(F24_R_2)
    extrude(amount=-F25_DEPTH)

    # F24 (on Top) → F26 (cut)
    with BuildSketch(Plane.XY):
        with Locations((-51.6030266881, -15.5521593988)):
            Circle(F24_R_2)
    extrude(amount=-F26_DEPTH, mode=Mode.SUBTRACT)


solid = Compound([f1.part, f9.part, f14.part, f19.part, f20.part, f21.part, f23.part, f25.part])
